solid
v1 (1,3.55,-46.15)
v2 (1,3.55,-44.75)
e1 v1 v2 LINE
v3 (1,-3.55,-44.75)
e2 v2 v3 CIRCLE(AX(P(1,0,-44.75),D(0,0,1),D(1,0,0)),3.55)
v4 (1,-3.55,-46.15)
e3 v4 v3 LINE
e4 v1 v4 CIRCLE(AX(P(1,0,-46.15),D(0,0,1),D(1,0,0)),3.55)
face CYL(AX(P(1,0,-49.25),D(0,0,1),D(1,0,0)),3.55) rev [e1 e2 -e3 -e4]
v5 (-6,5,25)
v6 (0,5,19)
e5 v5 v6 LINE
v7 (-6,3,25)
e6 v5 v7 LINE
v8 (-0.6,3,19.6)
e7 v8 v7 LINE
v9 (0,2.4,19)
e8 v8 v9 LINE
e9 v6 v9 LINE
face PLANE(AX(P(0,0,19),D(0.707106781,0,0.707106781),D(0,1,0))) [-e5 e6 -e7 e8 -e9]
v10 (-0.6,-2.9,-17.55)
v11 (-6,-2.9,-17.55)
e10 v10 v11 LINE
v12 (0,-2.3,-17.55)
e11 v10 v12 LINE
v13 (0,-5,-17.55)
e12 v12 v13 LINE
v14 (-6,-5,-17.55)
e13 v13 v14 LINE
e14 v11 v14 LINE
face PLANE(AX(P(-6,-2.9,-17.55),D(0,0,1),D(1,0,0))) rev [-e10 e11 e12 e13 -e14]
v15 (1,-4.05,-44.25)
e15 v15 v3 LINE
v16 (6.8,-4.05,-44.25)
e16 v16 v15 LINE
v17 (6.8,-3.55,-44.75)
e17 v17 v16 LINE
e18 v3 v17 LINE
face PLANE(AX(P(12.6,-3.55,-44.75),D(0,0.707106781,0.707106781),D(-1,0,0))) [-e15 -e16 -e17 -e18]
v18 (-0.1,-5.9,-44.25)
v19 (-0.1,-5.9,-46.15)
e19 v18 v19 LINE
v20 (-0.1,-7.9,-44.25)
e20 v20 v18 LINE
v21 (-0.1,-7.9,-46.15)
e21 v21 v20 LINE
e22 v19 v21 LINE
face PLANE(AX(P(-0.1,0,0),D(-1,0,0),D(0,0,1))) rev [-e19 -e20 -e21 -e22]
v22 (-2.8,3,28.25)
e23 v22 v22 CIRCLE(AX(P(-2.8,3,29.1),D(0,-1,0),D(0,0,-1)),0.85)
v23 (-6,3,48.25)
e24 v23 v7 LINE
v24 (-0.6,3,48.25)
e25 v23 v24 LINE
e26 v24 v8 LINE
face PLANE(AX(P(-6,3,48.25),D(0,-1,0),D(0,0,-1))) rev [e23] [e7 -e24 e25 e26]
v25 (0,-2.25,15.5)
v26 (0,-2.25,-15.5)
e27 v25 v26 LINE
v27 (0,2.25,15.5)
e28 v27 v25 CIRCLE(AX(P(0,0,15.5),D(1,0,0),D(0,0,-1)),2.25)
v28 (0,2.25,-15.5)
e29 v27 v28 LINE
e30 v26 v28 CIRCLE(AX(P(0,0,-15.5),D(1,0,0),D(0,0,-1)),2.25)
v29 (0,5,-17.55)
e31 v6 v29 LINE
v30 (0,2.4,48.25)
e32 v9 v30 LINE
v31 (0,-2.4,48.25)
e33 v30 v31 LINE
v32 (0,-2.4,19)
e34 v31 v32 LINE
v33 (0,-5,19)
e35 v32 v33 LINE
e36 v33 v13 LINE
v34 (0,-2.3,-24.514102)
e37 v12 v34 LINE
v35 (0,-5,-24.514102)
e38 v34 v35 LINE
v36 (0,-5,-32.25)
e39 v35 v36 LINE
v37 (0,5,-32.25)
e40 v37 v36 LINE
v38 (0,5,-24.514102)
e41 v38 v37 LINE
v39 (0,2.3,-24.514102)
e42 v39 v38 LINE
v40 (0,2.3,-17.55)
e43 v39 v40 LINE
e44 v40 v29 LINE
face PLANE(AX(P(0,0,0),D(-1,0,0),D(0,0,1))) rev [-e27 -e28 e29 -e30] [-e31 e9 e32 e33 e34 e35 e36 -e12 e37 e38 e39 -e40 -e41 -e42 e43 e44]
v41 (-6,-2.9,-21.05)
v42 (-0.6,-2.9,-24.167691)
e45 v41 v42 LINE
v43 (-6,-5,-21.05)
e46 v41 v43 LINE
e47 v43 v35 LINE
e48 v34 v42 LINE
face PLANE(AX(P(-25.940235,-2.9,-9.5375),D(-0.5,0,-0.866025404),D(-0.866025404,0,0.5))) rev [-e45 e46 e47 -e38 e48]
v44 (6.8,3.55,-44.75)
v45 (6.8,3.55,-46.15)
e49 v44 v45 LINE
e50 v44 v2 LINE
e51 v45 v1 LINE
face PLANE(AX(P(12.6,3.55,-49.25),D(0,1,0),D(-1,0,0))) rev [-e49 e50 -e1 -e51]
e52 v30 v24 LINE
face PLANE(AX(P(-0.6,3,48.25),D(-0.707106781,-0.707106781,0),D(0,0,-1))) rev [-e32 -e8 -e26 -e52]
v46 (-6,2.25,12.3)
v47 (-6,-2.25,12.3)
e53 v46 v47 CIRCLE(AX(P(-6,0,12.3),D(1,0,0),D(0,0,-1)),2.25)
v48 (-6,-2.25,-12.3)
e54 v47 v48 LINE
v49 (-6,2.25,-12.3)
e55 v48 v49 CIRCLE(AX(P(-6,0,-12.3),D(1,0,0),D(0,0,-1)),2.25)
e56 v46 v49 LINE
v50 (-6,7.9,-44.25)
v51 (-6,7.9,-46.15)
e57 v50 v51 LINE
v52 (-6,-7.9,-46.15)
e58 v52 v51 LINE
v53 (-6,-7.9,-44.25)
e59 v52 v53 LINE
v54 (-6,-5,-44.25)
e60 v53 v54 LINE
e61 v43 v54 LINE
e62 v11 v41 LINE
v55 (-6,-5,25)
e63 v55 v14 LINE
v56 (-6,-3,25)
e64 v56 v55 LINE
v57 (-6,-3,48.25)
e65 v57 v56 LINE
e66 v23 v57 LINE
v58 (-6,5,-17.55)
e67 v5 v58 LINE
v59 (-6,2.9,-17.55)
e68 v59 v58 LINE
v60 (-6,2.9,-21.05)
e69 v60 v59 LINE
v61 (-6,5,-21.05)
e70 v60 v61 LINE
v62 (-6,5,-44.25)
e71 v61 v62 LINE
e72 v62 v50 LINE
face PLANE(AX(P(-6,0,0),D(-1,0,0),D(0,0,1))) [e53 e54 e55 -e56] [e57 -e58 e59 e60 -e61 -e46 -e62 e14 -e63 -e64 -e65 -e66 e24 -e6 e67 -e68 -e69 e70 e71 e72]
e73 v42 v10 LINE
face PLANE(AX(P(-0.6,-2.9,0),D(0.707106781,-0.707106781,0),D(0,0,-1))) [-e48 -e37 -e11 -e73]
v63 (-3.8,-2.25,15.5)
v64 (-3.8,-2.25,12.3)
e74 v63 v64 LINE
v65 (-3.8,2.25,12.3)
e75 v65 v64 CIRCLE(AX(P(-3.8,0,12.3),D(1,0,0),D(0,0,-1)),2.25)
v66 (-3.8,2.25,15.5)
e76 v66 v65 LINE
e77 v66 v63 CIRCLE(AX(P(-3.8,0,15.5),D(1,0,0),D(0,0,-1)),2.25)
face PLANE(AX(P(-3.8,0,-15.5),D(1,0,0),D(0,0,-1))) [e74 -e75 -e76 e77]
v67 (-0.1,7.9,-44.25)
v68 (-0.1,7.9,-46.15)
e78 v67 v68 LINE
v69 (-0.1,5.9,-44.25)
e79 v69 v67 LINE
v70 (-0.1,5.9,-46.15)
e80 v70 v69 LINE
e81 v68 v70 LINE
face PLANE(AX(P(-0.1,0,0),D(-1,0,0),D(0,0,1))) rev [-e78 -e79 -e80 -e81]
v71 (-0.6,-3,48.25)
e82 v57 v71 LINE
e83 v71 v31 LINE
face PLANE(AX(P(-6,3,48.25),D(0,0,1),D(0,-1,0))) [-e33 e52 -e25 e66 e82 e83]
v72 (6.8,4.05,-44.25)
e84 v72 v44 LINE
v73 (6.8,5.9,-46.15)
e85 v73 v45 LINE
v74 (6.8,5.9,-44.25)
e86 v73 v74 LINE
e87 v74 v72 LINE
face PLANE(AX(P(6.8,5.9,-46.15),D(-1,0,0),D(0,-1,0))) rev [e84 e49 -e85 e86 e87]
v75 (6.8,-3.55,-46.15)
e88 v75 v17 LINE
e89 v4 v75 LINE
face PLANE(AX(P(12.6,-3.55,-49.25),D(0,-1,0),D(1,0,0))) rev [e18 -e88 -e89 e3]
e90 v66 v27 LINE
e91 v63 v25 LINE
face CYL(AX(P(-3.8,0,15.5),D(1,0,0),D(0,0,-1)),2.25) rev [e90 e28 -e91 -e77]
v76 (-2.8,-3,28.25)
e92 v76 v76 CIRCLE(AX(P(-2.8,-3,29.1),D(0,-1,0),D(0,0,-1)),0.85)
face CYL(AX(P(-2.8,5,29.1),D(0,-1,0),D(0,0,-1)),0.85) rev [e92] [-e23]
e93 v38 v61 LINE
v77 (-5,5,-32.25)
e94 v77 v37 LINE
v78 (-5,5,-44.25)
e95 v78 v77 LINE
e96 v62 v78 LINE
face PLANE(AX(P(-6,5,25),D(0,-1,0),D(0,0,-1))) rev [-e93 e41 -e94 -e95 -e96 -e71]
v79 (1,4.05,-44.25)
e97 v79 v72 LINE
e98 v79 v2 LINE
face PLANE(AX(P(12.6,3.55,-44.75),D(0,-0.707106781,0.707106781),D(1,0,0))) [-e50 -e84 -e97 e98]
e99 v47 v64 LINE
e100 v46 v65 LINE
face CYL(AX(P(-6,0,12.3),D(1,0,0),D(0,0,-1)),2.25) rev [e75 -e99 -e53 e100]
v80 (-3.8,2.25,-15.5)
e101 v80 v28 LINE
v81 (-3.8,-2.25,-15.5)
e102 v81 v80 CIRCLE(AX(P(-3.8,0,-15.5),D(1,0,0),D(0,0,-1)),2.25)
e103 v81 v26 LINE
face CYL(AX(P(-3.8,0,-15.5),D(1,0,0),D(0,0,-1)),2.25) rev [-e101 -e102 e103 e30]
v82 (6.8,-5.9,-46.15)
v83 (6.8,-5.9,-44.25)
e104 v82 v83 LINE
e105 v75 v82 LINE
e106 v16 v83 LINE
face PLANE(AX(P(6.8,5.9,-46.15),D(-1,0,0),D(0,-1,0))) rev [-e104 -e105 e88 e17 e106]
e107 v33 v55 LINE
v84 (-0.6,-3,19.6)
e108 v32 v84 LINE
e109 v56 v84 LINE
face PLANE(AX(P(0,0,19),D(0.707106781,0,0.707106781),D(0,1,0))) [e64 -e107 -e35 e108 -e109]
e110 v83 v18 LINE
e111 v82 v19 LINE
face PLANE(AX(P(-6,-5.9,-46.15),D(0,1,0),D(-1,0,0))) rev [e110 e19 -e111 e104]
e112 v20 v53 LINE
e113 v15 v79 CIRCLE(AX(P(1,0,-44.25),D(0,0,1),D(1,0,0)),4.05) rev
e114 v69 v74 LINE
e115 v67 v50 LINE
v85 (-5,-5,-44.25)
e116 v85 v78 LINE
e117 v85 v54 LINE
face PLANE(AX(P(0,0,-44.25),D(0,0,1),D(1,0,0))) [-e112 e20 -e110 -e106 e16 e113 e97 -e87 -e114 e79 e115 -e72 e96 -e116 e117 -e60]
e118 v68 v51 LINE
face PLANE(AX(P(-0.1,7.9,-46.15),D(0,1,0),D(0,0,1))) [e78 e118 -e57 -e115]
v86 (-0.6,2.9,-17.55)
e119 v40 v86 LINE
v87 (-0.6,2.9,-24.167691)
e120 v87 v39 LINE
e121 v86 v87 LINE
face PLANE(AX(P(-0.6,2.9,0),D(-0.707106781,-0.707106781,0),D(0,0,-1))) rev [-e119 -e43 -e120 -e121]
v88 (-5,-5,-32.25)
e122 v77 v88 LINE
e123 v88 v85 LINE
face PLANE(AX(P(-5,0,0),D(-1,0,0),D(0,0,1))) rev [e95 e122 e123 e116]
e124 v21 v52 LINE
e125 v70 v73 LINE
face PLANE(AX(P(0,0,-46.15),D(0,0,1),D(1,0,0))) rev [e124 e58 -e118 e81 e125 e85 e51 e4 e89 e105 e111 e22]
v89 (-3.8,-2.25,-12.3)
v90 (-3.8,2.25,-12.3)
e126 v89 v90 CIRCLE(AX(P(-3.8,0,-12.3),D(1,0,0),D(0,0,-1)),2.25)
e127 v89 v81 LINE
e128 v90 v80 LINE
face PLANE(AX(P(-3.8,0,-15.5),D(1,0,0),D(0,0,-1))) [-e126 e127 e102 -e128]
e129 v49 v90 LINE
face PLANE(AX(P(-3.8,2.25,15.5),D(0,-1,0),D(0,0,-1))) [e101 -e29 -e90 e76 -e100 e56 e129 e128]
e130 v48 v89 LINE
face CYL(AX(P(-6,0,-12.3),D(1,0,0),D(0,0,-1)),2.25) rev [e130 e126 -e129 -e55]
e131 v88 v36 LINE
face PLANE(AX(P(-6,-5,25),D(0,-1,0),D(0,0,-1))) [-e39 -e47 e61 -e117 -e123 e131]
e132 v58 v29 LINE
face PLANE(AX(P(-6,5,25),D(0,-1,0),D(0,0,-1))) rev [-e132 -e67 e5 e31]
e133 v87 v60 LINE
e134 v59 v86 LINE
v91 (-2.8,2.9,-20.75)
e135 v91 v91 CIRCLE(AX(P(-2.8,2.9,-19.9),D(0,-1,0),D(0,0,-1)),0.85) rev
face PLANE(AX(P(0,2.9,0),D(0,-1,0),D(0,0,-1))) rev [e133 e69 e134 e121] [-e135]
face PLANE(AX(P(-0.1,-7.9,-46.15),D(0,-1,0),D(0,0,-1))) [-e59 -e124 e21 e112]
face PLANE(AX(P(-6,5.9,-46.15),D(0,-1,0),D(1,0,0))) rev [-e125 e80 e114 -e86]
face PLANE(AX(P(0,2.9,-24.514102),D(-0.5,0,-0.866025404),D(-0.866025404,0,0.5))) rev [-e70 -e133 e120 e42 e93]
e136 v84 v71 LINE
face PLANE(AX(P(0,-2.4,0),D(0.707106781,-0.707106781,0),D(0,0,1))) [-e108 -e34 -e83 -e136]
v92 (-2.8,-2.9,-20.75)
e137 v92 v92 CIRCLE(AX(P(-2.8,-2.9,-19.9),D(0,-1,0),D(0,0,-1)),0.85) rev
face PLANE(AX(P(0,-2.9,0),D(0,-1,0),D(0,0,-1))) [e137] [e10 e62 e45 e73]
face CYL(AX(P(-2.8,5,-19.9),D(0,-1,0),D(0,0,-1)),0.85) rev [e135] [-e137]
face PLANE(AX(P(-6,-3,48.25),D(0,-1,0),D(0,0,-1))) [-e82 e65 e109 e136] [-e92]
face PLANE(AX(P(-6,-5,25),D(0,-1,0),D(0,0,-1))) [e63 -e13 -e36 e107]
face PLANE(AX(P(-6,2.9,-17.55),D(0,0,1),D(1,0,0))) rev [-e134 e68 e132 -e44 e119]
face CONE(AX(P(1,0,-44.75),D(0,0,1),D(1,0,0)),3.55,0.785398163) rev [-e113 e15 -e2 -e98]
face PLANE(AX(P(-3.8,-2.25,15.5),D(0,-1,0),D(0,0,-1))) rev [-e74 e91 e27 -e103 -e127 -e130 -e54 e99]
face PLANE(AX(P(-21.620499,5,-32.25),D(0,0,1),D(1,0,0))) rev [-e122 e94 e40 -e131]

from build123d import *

# Parameters (mm, degrees)
EXTRUDE_1_DEPTH     = 6
CUT_EXTRUDE_1_DEPTH = 3.8
CUT_EXTRUDE_2_DEPTH = 49.87803699
SKETCH_3_W          = 18.536502565
SKETCH_3_H          = 15.637579157
CUT_EXTRUDE_3_DEPTH = 4
SKETCH_4_W          = 6
SKETCH_4_H          = 10
EXTRUDE_2_DEPTH     = 19.25
SKETCH_5_R          = 0.85
CUT_EXTRUDE_4_DEPTH = 50.639324129
SKETCH_7_W          = 12.8
SKETCH_7_H          = 11.8
EXTRUDE_3_DEPTH     = 1.9
SKETCH_8_W          = 12
SKETCH_8_H          = 10
CUT_EXTRUDE_5_DEPTH = 5
CUT_EXTRUDE_6_DEPTH = 5
CHAMFER_1_SIZE      = 0.5
SKETCH_10_W         = 1.9
SKETCH_10_H         = 2
EXTRUDE_4_DEPTH     = 5.9
CHAMFER_2_SIZE      = 6
CUT_EXTRUDE_7_DEPTH = 2.1
CUT_EXTRUDE_START   = -10
CUT_EXTRUDE_8_DEPTH = 2.1
CHAMFER_3_SIZE      = 0.6


with BuildPart() as part:
    # 草图1 → 凸台-拉伸1 (new body)
    with BuildSketch(Plane(origin=(0, 0, 0), x_dir=(0, 0, -1), z_dir=(1, 0, 0))):
        Polygon((-25, 5), (25, 5), (25, 3), (48.25, 3), (48.25, -3), (25, -3), (25, -5), (-25, -5), (-25, -3), (-48.25, -3), (-48.25, 3), (-25, 3), align=None)
    extrude(amount=-EXTRUDE_1_DEPTH)

    # 草图1<3> → 切除-拉伸1 (cut)
    with BuildSketch(Plane(origin=(0, 0, 0), x_dir=(0, 0, -1), z_dir=(1, 0, 0))):
        with BuildLine():
            Line((-15.5, 2.25), (15.5, 2.25))
            ThreePointArc((15.5, 2.25), (17.75, 0), (15.5, -2.25))
            Line((15.5, -2.25), (-15.5, -2.25))
            ThreePointArc((-15.5, -2.25), (-17.75, 0), (-15.5, 2.25))
        make_face()
    extrude(amount=-CUT_EXTRUDE_1_DEPTH, mode=Mode.SUBTRACT)

    # 草图1<4> → 切除-拉伸2 (cut, through all)
    with BuildSketch(Plane(origin=(0, 0, 0), x_dir=(0, 0, -1), z_dir=(1, 0, 0))):
        with BuildLine():
            Line((-12.3, 2.25), (12.3, 2.25))
            ThreePointArc((12.3, 2.25), (14.55, 0), (12.3, -2.25))
            Line((12.3, -2.25), (-12.3, -2.25))
            ThreePointArc((-12.3, -2.25), (-14.55, 0), (-12.3, 2.25))
        make_face()
    extrude(amount=-CUT_EXTRUDE_2_DEPTH, mode=Mode.SUBTRACT)

    # 草图3 → 切除-拉伸3 (cut)
    with BuildSketch(Plane(origin=(0, 0, -48.25), x_dir=(-1, 0, 0), z_dir=(0, 0, -1))):
        with Locations((1.626975839, 1.766046581)):
            Rectangle(SKETCH_3_W, SKETCH_3_H)
    extrude(amount=-CUT_EXTRUDE_3_DEPTH, mode=Mode.SUBTRACT)

    # 草图4 → 凸台-拉伸2 (add)
    with BuildSketch(Plane(origin=(0, 0, -25), x_dir=(-1, 0, 0), z_dir=(0, 0, -1))):
        with Locations((3, 0)):
            Rectangle(SKETCH_4_W, SKETCH_4_H)
    extrude(amount=EXTRUDE_2_DEPTH)

    # 草图5 → 切除-拉伸4 (cut, through all)
    with BuildSketch(Plane.XZ.offset(5)):
        with Locations(Location((-2.8, 29.1, 0), (0, 0, 270))):
            Circle(SKETCH_5_R)
        with Locations(Location((-2.8, -19.9, 0), (0, 0, 270))):
            Circle(SKETCH_5_R)
    extrude(amount=-CUT_EXTRUDE_4_DEPTH, mode=Mode.SUBTRACT)

    # 草图7 → 凸台-拉伸3 (add)
    with BuildSketch(Plane(origin=(0, 0, -44.25), x_dir=(-1, 0, 0), z_dir=(0, 0, -1))):
        with Locations((-0.4, 0)):
            Rectangle(SKETCH_7_W, SKETCH_7_H)
    extrude(amount=EXTRUDE_3_DEPTH)

    # 草图8 → 切除-拉伸5 (cut)
    with BuildSketch(Plane(origin=(0, 0, 0), x_dir=(0, 0, -1), z_dir=(1, 0, 0))):
        with Locations((38.25, 0)):
            Rectangle(SKETCH_8_W, SKETCH_8_H)
    extrude(amount=-CUT_EXTRUDE_5_DEPTH, mode=Mode.SUBTRACT)

    # 草图9 → 切除-拉伸6 (cut)
    with BuildSketch(Plane.XY.offset(-44.25)):
        with BuildLine():
            Line((12.6, -3.55), (1, -3.55))
            ThreePointArc((1, -3.55), (-2.55, 0), (1, 3.55))
            Line((1, 3.55), (12.6, 3.55))
            ThreePointArc((12.6, 3.55), (16.15, 0), (12.6, -3.55))
        make_face()
    extrude(amount=-CUT_EXTRUDE_6_DEPTH, mode=Mode.SUBTRACT)

    # 倒角1
    chamfer_1_edges = [part.edges().sort_by_distance(p)[0] for p in [
        (3.9, 3.55, -44.25),
        (3.9, -3.55, -44.25),
        (-2.55, 0, -44.25),
    ]]
    chamfer(chamfer_1_edges, length=CHAMFER_1_SIZE)

    # 草图10 → 凸台-拉伸4 (add)
    with BuildSketch(Plane.ZY.offset(6)):
        with Locations((-45.2, 6.9)):
            Rectangle(SKETCH_10_W, SKETCH_10_H)
        with Locations((-45.2, -6.9)):
            Rectangle(SKETCH_10_W, SKETCH_10_H)
    extrude(amount=-EXTRUDE_4_DEPTH)

    # 倒角2
    chamfer_2_edges = [part.edges().sort_by_distance(p)[0] for p in [
        (0, 4, 25),
        (0, -4, 25),
    ]]
    chamfer(chamfer_2_edges, length=CHAMFER_2_SIZE - 0.0001)  # a hair under: the kernel refuses the full size

    # 草图11 → 切除-拉伸7 (cut)
    with BuildSketch(Plane(origin=(0, 5, 0), x_dir=(1, 0, 0), z_dir=(0, 1, 0))):
        Polygon((0, 24.514101615), (-6, 21.05), (-6, 17.55), (0, 17.55), align=None)
    extrude(amount=-CUT_EXTRUDE_7_DEPTH, mode=Mode.SUBTRACT)

    # 草图11<2> → 切除-拉伸8 (cut)
    with BuildSketch(Plane(origin=(0, 5, 0), x_dir=(1, 0, 0), z_dir=(0, 1, 0)).offset(CUT_EXTRUDE_START)):
        Polygon((0, 24.514101615), (-6, 21.05), (-6, 17.55), (0, 17.55), align=None)
    extrude(amount=CUT_EXTRUDE_8_DEPTH, mode=Mode.SUBTRACT)

    # 倒角3
    chamfer_3_edges = [part.edges().sort_by_distance(p)[0] for p in [
        (0, 3, 33.62505),
        (0, -3, 33.62505),
        (0, 2.9, -21.032050808),
        (0, -2.9, -21.032050808),
    ]]
    chamfer(chamfer_3_edges, length=CHAMFER_3_SIZE)


solid = part.part
